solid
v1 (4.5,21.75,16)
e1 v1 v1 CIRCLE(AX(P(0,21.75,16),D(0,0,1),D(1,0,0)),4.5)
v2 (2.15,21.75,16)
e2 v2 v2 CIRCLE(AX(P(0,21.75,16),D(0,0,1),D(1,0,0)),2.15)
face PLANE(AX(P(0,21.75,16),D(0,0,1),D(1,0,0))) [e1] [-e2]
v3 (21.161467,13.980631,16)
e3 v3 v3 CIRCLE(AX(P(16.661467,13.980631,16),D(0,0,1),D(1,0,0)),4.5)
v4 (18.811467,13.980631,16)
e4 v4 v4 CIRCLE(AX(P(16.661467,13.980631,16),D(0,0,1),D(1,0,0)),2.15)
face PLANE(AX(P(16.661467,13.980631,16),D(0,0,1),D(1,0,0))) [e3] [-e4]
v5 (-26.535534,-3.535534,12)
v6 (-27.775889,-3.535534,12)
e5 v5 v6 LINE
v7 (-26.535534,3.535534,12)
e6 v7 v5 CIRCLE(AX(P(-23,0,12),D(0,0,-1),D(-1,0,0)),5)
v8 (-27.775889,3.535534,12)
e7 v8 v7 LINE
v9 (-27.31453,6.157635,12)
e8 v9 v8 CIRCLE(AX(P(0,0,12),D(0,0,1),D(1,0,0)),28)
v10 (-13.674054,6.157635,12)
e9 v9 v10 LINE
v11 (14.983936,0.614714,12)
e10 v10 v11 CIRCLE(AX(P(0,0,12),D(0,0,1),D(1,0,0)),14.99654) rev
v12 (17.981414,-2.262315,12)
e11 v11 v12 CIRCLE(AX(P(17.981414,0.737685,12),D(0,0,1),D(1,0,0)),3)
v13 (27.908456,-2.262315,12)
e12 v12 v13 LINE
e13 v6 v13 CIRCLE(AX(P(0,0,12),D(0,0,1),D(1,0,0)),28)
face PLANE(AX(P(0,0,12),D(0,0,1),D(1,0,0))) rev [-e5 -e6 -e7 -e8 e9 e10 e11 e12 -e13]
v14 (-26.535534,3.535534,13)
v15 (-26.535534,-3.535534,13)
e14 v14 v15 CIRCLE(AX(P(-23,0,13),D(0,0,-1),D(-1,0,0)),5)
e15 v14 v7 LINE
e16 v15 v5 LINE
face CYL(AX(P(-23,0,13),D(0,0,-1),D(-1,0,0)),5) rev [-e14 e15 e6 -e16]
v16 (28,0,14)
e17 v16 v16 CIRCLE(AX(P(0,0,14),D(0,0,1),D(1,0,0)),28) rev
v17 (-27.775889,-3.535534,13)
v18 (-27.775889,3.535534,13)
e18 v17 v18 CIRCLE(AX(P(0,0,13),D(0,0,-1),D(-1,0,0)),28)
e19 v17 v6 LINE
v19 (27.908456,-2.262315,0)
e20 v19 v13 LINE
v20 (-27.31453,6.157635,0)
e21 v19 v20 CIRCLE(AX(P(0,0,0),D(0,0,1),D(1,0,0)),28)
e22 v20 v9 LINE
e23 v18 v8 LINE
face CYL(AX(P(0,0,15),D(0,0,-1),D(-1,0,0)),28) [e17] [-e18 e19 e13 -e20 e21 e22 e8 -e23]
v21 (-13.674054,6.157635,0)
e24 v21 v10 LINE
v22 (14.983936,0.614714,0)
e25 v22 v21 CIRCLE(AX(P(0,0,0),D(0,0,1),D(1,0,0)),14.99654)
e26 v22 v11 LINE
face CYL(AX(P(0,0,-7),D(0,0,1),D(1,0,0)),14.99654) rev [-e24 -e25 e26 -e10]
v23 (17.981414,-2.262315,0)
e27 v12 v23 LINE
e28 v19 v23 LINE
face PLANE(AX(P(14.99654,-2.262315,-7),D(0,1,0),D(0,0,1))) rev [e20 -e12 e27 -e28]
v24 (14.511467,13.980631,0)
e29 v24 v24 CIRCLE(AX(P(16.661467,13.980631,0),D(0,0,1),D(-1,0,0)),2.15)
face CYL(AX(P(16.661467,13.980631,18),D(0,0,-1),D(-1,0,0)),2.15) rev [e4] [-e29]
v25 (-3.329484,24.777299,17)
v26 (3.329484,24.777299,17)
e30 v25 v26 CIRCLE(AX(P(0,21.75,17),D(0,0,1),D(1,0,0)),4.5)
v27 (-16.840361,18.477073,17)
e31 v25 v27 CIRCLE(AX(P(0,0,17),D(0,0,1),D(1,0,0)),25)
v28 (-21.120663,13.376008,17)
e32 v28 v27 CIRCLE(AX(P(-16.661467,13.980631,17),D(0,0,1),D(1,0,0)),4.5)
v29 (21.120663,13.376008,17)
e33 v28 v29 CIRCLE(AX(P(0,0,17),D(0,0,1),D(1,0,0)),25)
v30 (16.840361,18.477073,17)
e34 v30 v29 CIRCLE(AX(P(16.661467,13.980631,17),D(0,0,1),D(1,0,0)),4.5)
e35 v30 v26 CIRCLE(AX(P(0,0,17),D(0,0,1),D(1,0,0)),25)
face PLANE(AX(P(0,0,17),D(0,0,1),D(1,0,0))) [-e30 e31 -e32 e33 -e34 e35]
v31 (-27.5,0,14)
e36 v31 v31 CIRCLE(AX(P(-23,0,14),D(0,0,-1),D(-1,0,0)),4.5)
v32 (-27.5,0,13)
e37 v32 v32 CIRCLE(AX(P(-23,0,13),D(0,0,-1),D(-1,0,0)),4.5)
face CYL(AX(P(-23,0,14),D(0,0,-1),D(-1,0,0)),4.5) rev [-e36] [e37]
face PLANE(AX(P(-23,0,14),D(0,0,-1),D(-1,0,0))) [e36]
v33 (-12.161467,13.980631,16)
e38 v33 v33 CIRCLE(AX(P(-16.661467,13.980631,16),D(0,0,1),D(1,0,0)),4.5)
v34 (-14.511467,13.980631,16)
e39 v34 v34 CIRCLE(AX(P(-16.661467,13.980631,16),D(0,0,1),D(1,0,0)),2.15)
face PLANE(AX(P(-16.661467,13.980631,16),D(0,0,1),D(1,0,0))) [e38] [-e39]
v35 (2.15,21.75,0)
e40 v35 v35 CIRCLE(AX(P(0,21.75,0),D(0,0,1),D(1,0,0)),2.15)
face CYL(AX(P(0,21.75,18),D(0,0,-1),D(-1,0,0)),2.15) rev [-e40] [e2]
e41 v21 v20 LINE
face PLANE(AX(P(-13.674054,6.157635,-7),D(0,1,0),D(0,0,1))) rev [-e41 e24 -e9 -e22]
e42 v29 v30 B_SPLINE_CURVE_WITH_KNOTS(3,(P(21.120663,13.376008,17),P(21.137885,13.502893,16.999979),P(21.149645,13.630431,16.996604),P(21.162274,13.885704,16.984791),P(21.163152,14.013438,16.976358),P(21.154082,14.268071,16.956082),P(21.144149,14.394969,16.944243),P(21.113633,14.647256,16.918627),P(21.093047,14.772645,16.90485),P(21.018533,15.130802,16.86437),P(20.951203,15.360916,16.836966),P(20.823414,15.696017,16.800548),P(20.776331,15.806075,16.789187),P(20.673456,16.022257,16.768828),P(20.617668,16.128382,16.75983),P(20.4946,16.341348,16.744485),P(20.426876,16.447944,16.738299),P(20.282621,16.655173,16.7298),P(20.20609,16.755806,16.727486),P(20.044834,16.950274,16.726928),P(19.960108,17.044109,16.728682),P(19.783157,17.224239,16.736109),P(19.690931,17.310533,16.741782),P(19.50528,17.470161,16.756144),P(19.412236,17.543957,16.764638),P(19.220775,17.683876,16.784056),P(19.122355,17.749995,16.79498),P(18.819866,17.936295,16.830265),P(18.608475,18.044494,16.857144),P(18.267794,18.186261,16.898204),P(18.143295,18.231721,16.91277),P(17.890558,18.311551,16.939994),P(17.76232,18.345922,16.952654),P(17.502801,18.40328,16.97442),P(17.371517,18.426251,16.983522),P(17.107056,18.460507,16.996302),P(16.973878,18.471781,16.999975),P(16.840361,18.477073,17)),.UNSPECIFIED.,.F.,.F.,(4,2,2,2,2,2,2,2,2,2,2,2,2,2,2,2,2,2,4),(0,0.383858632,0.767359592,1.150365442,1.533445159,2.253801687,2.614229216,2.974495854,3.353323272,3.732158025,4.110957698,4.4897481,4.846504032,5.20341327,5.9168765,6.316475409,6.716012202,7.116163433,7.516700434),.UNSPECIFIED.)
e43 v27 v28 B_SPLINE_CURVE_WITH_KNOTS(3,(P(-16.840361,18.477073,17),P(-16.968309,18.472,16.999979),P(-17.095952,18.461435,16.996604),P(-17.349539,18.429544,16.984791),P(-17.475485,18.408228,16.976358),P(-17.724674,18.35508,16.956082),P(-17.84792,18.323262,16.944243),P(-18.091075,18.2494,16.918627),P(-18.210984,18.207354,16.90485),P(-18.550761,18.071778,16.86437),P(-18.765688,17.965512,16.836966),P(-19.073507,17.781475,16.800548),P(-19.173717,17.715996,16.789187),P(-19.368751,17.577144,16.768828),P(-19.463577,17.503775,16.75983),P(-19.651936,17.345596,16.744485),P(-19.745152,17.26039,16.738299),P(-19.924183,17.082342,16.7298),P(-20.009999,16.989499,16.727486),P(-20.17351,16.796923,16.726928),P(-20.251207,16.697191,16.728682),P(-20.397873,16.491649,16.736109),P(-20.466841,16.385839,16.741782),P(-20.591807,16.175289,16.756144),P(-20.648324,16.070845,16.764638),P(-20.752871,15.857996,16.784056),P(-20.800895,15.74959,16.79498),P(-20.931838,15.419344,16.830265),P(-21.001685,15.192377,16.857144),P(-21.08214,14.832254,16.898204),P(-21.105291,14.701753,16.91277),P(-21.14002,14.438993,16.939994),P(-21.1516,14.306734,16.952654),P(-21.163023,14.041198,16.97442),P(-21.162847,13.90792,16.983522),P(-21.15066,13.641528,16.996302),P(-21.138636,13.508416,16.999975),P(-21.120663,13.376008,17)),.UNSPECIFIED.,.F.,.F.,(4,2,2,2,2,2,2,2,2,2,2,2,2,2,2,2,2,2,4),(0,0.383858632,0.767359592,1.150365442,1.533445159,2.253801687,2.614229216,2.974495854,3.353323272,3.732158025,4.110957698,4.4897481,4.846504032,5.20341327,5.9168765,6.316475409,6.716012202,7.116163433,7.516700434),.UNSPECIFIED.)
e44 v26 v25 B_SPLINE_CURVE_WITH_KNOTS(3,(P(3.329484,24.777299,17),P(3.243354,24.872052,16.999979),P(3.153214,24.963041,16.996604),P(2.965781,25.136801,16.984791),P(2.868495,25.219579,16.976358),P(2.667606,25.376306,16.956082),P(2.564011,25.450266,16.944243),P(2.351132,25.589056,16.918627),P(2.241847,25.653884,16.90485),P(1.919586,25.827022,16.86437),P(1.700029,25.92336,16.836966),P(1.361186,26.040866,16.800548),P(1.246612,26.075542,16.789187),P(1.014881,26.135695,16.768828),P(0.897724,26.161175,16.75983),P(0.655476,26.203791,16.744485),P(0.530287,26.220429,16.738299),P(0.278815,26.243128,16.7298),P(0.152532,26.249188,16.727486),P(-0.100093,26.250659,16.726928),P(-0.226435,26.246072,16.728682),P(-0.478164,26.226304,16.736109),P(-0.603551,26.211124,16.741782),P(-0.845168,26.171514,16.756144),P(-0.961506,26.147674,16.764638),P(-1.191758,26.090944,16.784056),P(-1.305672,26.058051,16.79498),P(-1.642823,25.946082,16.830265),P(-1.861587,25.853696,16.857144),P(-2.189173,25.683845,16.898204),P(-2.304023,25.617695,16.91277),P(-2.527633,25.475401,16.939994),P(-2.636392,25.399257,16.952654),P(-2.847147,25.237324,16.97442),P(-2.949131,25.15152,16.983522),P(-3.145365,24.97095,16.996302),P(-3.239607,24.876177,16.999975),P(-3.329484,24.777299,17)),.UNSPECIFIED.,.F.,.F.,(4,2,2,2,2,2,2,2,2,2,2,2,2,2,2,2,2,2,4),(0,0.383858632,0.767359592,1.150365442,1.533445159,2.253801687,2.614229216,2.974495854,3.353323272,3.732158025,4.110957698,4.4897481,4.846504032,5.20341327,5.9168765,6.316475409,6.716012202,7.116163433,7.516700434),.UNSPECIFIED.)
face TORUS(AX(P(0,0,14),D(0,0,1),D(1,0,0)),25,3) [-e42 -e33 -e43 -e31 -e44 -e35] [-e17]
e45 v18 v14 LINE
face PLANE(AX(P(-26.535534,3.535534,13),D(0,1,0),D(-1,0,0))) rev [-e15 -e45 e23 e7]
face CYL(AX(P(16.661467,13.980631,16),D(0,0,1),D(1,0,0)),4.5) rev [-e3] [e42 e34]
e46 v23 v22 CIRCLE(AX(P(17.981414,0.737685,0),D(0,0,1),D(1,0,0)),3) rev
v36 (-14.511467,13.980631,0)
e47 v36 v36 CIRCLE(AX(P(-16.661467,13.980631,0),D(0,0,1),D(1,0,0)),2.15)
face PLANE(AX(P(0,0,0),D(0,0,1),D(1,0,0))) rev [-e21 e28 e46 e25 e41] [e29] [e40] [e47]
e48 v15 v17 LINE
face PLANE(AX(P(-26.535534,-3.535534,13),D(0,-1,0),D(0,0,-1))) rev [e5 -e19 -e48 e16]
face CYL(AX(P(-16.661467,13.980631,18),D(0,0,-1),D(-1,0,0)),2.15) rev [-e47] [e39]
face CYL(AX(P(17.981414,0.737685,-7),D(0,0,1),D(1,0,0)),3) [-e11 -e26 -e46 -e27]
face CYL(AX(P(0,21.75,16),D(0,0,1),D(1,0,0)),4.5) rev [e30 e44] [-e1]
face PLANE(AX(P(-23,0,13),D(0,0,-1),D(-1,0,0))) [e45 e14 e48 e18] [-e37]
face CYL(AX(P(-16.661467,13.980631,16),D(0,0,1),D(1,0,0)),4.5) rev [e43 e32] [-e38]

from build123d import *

# Parameters (mm, degrees)
SKETCH_1_R           = 28
EXTRUDE_1_DEPTH      = 15
CUT_EXTRUDE_START    = -22
CUT_EXTRUDE_1_DEPTH  = 22
EXTRUDE_2_DEPTH      = 2
EXTRUDE_2_DEPTH_BACK = 3
SKETCH_3_R           = 28
CUT_EXTRUDE_2_DEPTH  = 1
SKETCH_5_R           = 4.5
CUT_EXTRUDE_3_DEPTH  = 1
SKETCH_7_R           = 2.15
CUT_EXTRUDE_4_DEPTH  = 18
SKETCH_9_R           = 4.5
CUT_EXTRUDE_6_DEPTH  = 1
FILLET_5_R           = 3


with BuildPart() as part:
    # 草图1 → 凸台-拉伸1 (new body)
    with BuildSketch(Plane.XY):
        Circle(SKETCH_1_R)
    extrude(amount=EXTRUDE_1_DEPTH)

    # 草图2 → 切除-拉伸1 (cut)
    with BuildSketch(Plane.XY.offset(15).offset(CUT_EXTRUDE_START)):
        with BuildLine():
            Line((14.996539752, -0.000319471), (14.996539752, -2.262315411))
            Line((14.996539752, -2.262315411), (27.908456227, -2.262315411))
            ThreePointArc((27.908456227, -2.262315411), (-4.220435571, -27.680099776), (-27.314529778, 6.157634529))
            Line((-27.314529778, 6.157634529), (-13.674053592, 6.157634529))
            ThreePointArc((-13.674053592, 6.157634529), (3.149181128, 14.66215751), (14.996539752, -0.000319471))
        make_face()
    extrude(amount=CUT_EXTRUDE_1_DEPTH, mode=Mode.SUBTRACT)

    # 草图3 → 凸台-拉伸2 (add, two sides: drawn at the far end of the back side and taken through both)
    with BuildSketch(Plane.XY.offset(15).offset(-EXTRUDE_2_DEPTH_BACK)):
        with Locations(Location((0, 0, 0), (0, 0, 167.295928936))):
            Circle(SKETCH_3_R)
    extrude(amount=EXTRUDE_2_DEPTH + EXTRUDE_2_DEPTH_BACK)

    # 草图4 → 切除-拉伸2 (cut)
    with BuildSketch(Plane(origin=(0, 0, 12), x_dir=(-1, 0, 0), z_dir=(0, 0, -1))):
        with BuildLine():
            Line((26.535533906, 3.535533906), (27.775888825, 3.535533906))
            ThreePointArc((27.775888825, 3.535533906), (28, 0), (27.775888825, -3.535533906))
            Line((27.775888825, -3.535533906), (26.535533906, -3.535533906))
            ThreePointArc((26.535533906, -3.535533906), (18, 0), (26.535533906, 3.535533906))
        make_face()
    extrude(amount=-CUT_EXTRUDE_2_DEPTH, mode=Mode.SUBTRACT)

    # 草图5 → 切除-拉伸3 (cut)
    with BuildSketch(Plane(origin=(0, 0, 13), x_dir=(-1, 0, 0), z_dir=(0, 0, -1))):
        with Locations((23, 0)):
            Circle(SKETCH_5_R)
    extrude(amount=-CUT_EXTRUDE_3_DEPTH, mode=Mode.SUBTRACT)

    # 草图7 → 切除-拉伸4 (cut)
    with BuildSketch(Plane.XY):
        with Locations(Location((16.661466638, 13.980630511, 0), (0, 0, 180))):
            Circle(SKETCH_7_R)
        with Locations((-16.661466638, 13.980630511)):
            Circle(SKETCH_7_R)
        with Locations((0, 21.75)):
            Circle(SKETCH_7_R)
    extrude(amount=CUT_EXTRUDE_4_DEPTH, mode=Mode.SUBTRACT)

    # 草图9 → 切除-拉伸6 (cut)
    with BuildSketch(Plane.XY.offset(17)):
        with Locations((0, 21.75)):
            Circle(SKETCH_9_R)
        with Locations((16.661466638, 13.980630511)):
            Circle(SKETCH_9_R)
        with Locations((-16.661466638, 13.980630511)):
            Circle(SKETCH_9_R)
    extrude(amount=-CUT_EXTRUDE_6_DEPTH, mode=Mode.SUBTRACT)

    # 圆角5
    # the kernel refuses this fillet: 3 mm, written as the material it takes off along each edge
    with BuildSketch(Plane(origin=(14.996539752, -2.262315411, -7.462186675), x_dir=(1, 0, 0), z_dir=(0, 0, 1))) as fillet_5_piece_1:
        with BuildLine():
            CenterArc((2.98487467, 3), FILLET_5_R, 182.349232636, 87.650767364)
            Line((-0.012603956, 2.877028929), (-0.312351819, 2.864731822))
            ThreePointArc((-0.312351819, 2.864731822), (-0.3, 2.262002331), (-0.3, 0))
            Line((-0.3, 0), (0, -0.3))
            Line((0, -0.3), (2.98487467, -0.3))
            Line((2.98487467, -0.3), (2.98487467, 0))
        make_face()
    extrude(amount=19.462186675, mode=Mode.SUBTRACT)
    with BuildSketch(Plane(origin=(0, 0, 17), x_dir=(-0.9755189206474555, 0.21991551891311267, 0), z_dir=(0.21991551891311267, 0.9755189206474555, 0))) as fillet_5_piece_2:
        with BuildLine():
            CenterArc((28 - FILLET_5_R, -FILLET_5_R), FILLET_5_R, 0, 90)
            Line((28 - FILLET_5_R, 0), (28, 0))
            Line((28, 0), (28, -FILLET_5_R))
        make_face()
    revolve(axis=Axis((0, 0, 17), (0, 0, 1)), mode=Mode.SUBTRACT)


solid = part.part
